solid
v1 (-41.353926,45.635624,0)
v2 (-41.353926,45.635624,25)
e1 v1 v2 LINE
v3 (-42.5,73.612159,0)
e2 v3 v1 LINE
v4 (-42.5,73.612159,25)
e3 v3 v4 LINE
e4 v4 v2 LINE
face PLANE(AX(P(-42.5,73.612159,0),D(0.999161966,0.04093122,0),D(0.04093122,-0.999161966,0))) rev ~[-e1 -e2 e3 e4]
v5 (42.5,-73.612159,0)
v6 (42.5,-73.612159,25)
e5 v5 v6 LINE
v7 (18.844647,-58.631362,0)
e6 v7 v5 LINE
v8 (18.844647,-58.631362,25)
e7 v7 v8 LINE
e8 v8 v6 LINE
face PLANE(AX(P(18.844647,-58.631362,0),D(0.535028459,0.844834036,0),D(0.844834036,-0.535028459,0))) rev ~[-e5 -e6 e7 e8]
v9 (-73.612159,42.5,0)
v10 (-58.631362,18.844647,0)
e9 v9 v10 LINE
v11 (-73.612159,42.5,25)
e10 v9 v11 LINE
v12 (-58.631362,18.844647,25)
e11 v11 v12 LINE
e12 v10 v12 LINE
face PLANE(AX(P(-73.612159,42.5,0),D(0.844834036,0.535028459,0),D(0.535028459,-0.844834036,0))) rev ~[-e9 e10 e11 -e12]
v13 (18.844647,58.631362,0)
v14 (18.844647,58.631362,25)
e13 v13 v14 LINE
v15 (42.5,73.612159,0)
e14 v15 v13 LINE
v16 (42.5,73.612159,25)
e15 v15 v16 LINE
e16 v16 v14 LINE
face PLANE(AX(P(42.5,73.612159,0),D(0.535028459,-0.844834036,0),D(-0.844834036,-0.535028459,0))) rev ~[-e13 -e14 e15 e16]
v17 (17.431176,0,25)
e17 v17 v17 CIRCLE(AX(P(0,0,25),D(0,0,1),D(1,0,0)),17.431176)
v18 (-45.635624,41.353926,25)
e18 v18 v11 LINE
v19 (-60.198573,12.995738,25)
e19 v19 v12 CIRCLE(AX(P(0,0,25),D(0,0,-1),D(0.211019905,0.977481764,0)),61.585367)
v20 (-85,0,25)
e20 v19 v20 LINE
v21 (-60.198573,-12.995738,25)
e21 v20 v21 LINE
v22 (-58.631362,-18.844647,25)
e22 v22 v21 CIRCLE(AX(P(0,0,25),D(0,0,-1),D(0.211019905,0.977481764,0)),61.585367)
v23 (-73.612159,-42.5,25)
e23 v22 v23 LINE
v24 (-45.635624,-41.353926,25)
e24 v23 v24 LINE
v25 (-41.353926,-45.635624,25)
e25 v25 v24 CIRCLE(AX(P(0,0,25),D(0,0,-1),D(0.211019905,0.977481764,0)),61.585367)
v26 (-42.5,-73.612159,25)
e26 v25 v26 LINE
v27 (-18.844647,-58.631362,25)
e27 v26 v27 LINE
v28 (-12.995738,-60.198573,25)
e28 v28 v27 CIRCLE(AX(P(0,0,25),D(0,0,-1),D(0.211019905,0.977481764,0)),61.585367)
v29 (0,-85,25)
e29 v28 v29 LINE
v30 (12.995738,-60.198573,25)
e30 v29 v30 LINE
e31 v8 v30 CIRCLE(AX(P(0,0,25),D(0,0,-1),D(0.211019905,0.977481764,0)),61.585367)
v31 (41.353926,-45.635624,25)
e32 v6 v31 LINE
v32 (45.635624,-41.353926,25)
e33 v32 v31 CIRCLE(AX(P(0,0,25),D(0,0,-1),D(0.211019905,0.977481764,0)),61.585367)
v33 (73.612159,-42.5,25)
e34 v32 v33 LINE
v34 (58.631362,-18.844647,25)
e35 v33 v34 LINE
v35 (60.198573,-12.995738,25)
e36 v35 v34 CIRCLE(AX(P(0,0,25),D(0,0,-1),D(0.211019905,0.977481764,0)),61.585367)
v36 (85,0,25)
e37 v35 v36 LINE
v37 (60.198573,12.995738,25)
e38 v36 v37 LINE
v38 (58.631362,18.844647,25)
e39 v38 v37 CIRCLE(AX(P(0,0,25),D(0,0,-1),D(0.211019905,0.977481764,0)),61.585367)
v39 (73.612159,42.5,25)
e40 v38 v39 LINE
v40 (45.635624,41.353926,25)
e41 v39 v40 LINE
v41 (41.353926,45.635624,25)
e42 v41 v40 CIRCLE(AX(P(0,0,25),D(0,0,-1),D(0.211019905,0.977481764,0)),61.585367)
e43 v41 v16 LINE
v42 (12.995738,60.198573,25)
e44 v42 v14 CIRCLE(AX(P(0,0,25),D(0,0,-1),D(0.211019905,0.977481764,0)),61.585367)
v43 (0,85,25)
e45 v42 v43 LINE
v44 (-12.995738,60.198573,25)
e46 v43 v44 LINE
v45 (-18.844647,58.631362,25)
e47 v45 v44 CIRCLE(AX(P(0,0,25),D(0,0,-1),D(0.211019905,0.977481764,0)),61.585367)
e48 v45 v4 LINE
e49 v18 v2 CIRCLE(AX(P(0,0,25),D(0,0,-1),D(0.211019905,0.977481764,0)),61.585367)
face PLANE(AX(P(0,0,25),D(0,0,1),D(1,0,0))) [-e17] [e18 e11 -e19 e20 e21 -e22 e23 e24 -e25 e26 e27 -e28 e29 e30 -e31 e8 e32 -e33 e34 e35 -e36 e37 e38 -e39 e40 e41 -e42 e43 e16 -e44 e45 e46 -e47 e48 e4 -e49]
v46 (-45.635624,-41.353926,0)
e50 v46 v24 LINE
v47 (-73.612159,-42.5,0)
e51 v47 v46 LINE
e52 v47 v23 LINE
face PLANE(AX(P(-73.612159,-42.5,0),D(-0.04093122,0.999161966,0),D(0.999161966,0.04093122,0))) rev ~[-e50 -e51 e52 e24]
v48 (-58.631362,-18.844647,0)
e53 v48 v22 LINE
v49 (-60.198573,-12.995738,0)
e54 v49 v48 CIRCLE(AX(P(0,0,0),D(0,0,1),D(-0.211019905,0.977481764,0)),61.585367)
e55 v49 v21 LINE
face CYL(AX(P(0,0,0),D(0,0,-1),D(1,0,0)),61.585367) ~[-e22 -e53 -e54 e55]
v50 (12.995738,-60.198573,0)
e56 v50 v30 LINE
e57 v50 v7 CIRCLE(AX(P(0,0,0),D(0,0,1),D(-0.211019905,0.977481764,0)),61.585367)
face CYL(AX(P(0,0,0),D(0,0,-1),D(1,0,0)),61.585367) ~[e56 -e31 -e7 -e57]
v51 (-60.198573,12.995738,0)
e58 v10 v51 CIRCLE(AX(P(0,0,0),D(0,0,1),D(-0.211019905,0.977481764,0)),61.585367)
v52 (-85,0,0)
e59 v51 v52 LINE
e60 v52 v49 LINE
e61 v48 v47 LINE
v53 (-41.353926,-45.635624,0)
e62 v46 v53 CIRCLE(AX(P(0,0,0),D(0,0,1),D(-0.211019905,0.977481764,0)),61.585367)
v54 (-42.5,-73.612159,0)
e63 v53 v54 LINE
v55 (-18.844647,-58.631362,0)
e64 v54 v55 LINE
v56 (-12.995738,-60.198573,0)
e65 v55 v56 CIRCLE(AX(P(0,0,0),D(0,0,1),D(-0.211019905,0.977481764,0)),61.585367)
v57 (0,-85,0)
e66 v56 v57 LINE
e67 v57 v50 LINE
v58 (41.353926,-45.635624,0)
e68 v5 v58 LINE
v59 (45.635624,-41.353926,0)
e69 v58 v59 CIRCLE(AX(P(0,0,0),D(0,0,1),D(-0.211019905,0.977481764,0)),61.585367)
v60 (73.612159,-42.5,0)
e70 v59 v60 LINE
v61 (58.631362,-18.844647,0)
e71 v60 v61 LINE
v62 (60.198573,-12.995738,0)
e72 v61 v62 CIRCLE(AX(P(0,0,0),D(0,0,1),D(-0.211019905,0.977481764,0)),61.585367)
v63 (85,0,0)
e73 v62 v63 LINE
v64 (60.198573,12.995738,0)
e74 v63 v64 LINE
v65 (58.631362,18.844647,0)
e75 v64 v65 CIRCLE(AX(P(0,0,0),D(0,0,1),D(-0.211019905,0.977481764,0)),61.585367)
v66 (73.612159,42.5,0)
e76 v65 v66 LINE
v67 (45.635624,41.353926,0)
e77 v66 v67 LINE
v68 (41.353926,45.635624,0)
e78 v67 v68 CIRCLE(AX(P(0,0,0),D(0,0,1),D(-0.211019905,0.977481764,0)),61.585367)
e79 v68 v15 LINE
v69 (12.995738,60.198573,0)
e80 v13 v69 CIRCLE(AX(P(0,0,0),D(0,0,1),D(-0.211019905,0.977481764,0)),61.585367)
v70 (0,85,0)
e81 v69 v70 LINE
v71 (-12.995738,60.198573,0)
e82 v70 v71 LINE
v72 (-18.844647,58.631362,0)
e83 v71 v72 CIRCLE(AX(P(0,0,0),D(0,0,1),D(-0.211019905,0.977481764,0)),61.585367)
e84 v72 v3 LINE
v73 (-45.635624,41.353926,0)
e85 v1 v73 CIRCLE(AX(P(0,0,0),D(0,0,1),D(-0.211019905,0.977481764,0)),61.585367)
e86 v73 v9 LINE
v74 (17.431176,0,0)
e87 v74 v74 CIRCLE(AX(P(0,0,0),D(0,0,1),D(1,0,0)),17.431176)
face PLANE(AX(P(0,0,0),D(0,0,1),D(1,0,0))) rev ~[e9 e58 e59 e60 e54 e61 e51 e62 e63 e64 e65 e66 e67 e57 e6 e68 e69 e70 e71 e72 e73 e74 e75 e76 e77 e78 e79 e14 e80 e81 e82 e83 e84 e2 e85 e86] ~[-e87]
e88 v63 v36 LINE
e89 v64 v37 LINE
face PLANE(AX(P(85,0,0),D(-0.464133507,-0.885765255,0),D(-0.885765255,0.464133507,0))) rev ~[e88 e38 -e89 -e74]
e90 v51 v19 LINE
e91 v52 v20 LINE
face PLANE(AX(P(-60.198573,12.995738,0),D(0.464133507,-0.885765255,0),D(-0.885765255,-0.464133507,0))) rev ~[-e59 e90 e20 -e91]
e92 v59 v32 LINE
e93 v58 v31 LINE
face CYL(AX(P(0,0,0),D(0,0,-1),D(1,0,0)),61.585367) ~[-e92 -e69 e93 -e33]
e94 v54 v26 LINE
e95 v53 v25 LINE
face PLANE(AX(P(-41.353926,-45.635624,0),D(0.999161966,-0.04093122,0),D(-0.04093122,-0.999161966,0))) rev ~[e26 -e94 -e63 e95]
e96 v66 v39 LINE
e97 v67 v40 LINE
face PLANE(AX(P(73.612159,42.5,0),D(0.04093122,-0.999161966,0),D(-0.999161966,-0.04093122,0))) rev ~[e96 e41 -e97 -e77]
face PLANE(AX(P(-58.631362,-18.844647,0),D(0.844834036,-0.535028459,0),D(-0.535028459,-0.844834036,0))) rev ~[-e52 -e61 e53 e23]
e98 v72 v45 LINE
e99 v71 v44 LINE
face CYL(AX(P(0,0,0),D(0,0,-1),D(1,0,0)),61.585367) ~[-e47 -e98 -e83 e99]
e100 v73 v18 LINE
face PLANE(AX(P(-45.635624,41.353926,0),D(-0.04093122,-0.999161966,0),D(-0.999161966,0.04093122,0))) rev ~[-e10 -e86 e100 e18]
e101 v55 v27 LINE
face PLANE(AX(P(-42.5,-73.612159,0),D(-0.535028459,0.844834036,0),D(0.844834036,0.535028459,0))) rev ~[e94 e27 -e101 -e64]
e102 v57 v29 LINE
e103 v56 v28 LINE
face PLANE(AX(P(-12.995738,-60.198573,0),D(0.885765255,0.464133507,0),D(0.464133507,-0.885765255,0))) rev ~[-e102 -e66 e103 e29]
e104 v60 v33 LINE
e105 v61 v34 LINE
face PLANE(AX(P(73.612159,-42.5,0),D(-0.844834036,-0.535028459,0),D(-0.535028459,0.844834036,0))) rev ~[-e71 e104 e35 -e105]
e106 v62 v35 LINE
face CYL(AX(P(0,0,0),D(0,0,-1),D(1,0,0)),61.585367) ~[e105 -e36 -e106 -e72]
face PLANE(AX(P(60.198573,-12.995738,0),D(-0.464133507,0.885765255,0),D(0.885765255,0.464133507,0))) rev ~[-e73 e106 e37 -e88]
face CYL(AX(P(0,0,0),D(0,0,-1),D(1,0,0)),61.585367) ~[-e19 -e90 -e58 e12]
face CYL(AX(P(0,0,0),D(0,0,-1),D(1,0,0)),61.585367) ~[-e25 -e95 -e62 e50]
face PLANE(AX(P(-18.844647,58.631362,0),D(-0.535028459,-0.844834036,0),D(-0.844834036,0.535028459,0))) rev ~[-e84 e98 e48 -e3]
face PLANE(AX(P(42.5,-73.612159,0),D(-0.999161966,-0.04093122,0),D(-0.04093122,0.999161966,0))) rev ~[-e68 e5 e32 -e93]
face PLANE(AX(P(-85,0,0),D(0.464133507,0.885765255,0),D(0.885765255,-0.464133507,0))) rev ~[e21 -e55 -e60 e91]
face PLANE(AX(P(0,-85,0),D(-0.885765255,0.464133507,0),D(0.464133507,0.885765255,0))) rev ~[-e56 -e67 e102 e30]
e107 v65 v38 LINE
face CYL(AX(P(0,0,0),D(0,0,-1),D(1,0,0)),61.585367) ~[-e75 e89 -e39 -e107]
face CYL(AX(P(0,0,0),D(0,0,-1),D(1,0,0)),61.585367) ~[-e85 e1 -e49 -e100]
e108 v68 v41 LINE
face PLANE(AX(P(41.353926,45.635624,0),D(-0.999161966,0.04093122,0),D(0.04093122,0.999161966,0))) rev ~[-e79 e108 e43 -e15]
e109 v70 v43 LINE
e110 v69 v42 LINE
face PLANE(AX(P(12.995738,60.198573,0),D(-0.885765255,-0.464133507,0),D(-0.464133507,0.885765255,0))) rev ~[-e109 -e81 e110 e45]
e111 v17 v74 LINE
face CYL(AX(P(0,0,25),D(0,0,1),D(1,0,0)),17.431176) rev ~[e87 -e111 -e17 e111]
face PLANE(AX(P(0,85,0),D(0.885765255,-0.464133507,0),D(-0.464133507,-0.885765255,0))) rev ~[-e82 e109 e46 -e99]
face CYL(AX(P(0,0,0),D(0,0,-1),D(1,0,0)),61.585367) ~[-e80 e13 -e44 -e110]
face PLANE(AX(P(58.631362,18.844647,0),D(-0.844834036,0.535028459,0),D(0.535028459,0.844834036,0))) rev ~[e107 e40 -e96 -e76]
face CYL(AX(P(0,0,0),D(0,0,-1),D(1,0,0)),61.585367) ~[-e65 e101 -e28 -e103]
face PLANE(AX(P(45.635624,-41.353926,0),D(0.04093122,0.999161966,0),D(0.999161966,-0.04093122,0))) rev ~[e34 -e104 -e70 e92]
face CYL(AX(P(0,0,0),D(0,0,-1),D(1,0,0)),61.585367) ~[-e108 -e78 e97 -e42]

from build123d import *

# Parameters (mm, degrees)
F0_R            = 61.5853666469
F1_DEPTH        = 25
F2_R            = 17.4311755098
F3_DEPTH        = 25
F5_DEPTH        = 25
F5_COPIES_COUNT = 12


# Not quite as in the source:
# - a pattern or mirror of a feature is missing from the dataset's text; its kind, count and spacing are read off the source's solid


with BuildPart() as f1:
    # F0 (on Top) → F1 (new body)
    with BuildSketch(Plane.XY):
        Circle(F0_R)
    extrude(amount=F1_DEPTH)

    # F2 (on face) → F3 (cut)
    with BuildSketch(Plane.XY.offset(25)):
        Circle(F2_R)
    extrude(amount=-F3_DEPTH, mode=Mode.SUBTRACT)

    # F4 (on Top) → F5 (join)
    with BuildSketch(Plane.XY):
        with BuildLine():
            Line((0, 85), (-12.9957382045, 60.1985728532))
            ThreePointArc((-12.9957382045, 60.1985728532), (0, 61.5853666469), (12.9957382045, 60.1985728532))
            Line((12.9957382045, 60.1985728532), (0, 85))
        make_face()
    f5 = extrude(amount=F5_DEPTH)

    # F5_copies: F5 ×12 about axis
    f5_copies_axis = Axis((0, 0, 0), (0, 0, 1))
    for i in range(1, F5_COPIES_COUNT):
        add(f5.rotate(f5_copies_axis, i * 360 / F5_COPIES_COUNT))


solid = f1.part
